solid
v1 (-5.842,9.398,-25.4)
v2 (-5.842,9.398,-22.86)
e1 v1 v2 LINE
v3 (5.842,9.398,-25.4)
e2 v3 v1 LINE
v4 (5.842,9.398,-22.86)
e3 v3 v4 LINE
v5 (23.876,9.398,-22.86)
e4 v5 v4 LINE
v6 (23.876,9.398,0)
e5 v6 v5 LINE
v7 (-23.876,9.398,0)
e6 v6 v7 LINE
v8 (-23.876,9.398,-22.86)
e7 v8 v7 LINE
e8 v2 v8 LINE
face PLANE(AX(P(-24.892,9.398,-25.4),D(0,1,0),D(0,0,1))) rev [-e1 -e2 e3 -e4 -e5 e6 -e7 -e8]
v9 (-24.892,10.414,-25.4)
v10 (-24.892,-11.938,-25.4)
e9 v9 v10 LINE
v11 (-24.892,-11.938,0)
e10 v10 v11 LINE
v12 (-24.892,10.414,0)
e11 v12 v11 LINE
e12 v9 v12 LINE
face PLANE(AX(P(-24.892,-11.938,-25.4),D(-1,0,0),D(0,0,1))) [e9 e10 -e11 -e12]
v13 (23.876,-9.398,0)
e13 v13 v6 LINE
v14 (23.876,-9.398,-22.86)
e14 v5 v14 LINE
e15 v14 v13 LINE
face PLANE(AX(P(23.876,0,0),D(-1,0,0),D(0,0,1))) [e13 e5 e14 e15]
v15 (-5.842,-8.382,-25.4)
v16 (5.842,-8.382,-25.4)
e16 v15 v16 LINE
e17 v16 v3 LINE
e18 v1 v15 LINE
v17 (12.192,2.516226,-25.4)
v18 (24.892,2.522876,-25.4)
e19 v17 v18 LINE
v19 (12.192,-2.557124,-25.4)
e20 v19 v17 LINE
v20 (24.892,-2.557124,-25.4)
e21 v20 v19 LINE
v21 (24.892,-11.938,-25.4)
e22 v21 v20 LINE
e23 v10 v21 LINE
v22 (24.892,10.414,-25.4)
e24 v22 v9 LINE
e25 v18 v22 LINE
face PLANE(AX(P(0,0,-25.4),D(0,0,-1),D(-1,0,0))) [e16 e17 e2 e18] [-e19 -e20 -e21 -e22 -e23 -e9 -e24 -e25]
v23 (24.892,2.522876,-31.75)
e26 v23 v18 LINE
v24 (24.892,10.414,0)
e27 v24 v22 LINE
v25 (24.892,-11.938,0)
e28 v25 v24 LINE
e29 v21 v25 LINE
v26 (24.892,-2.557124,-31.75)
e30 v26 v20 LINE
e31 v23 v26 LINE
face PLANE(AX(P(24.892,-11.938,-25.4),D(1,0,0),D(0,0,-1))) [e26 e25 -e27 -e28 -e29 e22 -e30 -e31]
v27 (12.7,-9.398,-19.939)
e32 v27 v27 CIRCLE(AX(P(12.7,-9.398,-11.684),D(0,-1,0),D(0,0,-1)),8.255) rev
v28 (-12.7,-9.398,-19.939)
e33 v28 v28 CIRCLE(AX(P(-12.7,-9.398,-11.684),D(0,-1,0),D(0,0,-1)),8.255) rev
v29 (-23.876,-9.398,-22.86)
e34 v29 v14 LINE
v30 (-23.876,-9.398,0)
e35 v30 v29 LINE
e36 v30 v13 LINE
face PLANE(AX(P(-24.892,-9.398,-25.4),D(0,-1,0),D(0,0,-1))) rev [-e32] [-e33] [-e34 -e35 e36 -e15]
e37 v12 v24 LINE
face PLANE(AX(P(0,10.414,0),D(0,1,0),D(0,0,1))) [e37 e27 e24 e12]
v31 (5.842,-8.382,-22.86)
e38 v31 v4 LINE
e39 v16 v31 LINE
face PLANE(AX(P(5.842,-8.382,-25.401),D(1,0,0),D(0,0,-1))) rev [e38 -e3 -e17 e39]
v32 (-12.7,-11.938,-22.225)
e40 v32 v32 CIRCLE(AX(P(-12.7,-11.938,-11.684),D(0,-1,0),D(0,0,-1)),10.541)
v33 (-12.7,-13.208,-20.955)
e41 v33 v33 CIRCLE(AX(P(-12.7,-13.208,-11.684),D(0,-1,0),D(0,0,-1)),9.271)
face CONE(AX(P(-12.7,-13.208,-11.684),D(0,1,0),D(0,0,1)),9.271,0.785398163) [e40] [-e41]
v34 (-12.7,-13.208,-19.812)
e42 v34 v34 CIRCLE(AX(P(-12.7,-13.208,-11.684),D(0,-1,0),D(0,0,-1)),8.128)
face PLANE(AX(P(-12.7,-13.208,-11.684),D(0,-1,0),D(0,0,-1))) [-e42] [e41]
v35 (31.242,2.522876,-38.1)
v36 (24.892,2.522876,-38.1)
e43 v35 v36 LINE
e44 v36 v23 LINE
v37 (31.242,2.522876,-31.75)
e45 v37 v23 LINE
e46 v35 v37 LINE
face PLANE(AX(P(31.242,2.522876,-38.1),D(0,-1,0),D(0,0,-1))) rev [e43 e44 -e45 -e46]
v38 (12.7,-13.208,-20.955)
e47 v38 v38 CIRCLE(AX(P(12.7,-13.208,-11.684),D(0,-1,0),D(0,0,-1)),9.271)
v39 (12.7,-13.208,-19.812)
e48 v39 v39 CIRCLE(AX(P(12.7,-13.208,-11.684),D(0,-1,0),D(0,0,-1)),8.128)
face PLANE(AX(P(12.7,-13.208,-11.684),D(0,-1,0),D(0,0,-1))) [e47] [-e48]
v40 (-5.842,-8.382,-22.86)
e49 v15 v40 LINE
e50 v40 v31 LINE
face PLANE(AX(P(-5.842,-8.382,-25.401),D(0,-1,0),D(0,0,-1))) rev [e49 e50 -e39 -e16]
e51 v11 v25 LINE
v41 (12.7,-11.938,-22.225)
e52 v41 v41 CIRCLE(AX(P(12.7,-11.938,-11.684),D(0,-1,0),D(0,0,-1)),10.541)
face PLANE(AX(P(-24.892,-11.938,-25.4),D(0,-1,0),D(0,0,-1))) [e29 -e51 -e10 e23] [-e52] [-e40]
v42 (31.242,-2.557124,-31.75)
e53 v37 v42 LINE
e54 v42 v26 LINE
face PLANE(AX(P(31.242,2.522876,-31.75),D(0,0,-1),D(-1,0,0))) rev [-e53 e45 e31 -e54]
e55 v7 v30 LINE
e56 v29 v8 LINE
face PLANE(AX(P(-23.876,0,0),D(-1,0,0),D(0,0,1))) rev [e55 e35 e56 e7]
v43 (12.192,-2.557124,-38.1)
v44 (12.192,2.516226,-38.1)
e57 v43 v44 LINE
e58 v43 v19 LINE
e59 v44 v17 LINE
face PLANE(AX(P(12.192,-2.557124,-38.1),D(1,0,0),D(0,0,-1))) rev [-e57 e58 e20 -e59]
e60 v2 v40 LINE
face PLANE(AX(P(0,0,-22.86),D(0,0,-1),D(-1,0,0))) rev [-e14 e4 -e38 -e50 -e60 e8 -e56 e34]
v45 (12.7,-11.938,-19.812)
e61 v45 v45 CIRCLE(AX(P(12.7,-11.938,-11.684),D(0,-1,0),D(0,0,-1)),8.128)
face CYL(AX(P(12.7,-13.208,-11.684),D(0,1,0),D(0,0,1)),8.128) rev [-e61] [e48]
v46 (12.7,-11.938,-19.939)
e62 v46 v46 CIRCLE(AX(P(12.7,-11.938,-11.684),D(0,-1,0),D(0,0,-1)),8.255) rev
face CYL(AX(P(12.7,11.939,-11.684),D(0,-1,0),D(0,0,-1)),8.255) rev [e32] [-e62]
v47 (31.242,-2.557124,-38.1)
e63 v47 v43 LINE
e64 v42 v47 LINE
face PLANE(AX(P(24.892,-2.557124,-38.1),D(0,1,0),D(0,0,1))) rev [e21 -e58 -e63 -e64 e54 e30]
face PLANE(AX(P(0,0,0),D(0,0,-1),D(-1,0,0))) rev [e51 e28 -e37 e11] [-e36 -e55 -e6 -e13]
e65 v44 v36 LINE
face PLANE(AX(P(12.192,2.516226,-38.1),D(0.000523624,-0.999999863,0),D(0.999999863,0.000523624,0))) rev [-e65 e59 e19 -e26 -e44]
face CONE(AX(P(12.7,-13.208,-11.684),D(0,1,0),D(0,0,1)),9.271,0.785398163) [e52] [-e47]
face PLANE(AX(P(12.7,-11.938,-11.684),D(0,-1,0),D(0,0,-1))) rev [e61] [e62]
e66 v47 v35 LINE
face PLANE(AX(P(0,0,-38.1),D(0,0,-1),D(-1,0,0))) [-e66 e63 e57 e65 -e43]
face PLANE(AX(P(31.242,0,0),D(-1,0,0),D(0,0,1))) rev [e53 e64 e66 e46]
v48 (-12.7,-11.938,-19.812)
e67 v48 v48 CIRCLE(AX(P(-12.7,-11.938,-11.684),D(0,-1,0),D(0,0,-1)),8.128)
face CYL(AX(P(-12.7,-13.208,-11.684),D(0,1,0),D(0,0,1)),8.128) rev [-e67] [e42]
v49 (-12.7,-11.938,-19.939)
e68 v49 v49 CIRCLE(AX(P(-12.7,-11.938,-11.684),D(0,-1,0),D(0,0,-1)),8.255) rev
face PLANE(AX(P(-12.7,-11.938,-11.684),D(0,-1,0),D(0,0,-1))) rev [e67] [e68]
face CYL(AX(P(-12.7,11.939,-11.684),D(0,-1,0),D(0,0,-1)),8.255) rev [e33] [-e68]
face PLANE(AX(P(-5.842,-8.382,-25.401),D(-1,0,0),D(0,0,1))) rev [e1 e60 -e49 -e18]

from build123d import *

# Parameters (mm, degrees)
SKETCH1_W           = 49.784
SKETCH1_H           = 23.876
BOSS_EXTRUDE1_DEPTH = 25.4
SHELL1_T            = -2.54
CUT_EXTRUDE1_REACH  = 44.835
SKETCH2_R           = 8.255
CUT_EXTRUDE2_REACH  = 37.843
SKETCH4_W           = 11.684
SKETCH4_H           = 17.78
SKETCH5_R           = 10.541
SKETCH5_R_2         = 8.128
BOSS_EXTRUDE3_DEPTH = 1.27
BOSS_EXTRUDE4_DEPTH = 12.7
SKETCH8_W           = 6.35
SKETCH8_H           = 5.08
BOSS_EXTRUDE5_DEPTH = 6.35
SKETCH9_W           = 22.86
SKETCH9_H           = 18.796
CUT_EXTRUDE3_DEPTH  = 1.524
SKETCH10_W          = 22.86
SKETCH10_H          = 18.796
CUT_EXTRUDE4_DEPTH  = 1.524
CHAMFER1_SIZE       = 1.27
SKETCH11_W          = 49.784
SKETCH11_H          = 25.4
CUT_EXTRUDE5_DEPTH  = 1.524


with BuildPart() as part:
    # Sketch1 → Boss-Extrude1 (new body)
    with BuildSketch(Plane.XY):
        Rectangle(SKETCH1_W, SKETCH1_H)
    extrude(amount=-BOSS_EXTRUDE1_DEPTH)

    # Shell1
    shell1_openings = [part.faces().sort_by_distance(p)[0] for p in [
        (0, 0, 0),
    ]]
    offset(amount=SHELL1_T, openings=shell1_openings, kind=Kind.INTERSECTION)

    # Sketch2 → Cut-Extrude1 (cut, up to next)
    with BuildSketch(Plane.XZ.offset(11.938), mode=Mode.PRIVATE) as cut_extrude1_sk1:
        with Locations(Location((-12.7, -11.684, 0), (0, 0, 270))):
            Circle(SKETCH2_R)
    cut_extrude1_tool1 = extrude(cut_extrude1_sk1.sketch, amount=-CUT_EXTRUDE1_REACH, mode=Mode.PRIVATE) & part.part
    # Sketch2 → Cut-Extrude1 (cut, up to next)
    with BuildSketch(Plane.XZ.offset(11.938), mode=Mode.PRIVATE) as cut_extrude1_sk2:
        with Locations(Location((12.7, -11.684, 0), (0, 0, 270))):
            Circle(SKETCH2_R)
    cut_extrude1_tool2 = extrude(cut_extrude1_sk2.sketch, amount=-CUT_EXTRUDE1_REACH, mode=Mode.PRIVATE) & part.part
    add(cut_extrude1_tool1.solids().sort_by_distance((-12.7, -11.938, -11.684))[0], mode=Mode.SUBTRACT)
    add(cut_extrude1_tool2.solids().sort_by_distance((12.7, -11.938, -11.684))[0], mode=Mode.SUBTRACT)

    # Sketch4 → Cut-Extrude2 (cut, up to next)
    with BuildSketch(Plane.XY.offset(-22.86), mode=Mode.PRIVATE) as cut_extrude2_sk1:
        with Locations((0, 0.508)):
            Rectangle(SKETCH4_W, SKETCH4_H)
    cut_extrude2_tool1 = extrude(cut_extrude2_sk1.sketch, amount=-CUT_EXTRUDE2_REACH, mode=Mode.PRIVATE) & part.part
    add(cut_extrude2_tool1.solids().sort_by_distance((0, 0.508, -22.86))[0], mode=Mode.SUBTRACT)

    # Sketch5 → Boss-Extrude3 (add)
    # profile 1 of 2: a face of its own
    with BuildSketch(Plane.XZ.offset(11.938)):
        with Locations(Location((-12.7, -11.684, 0), (0, 0, 270))):
            Circle(SKETCH5_R)
        with Locations(Location((-12.7, -11.684, 0), (0, 0, 270))):
            Circle(SKETCH5_R_2, mode=Mode.SUBTRACT)
    # profile 2 of 2: a face of its own
    with BuildSketch(Plane.XZ.offset(11.938)):
        with Locations(Location((12.7, -11.684, 0), (0, 0, 270))):
            Circle(SKETCH5_R)
        with Locations(Location((12.7, -11.684, 0), (0, 0, 270))):
            Circle(SKETCH5_R_2, mode=Mode.SUBTRACT)
    extrude(amount=BOSS_EXTRUDE3_DEPTH)

    # Sketch7 → Boss-Extrude4 (add)
    with BuildSketch(Plane(origin=(0, 0, -25.4), x_dir=(-1, 0, 0), z_dir=(0, 0, -1))):
        Polygon((-24.892, 2.522876328), (-24.892, -2.557123672), (-12.192, -2.557123672), (-12.192, 2.516226298), align=None)
    extrude(amount=BOSS_EXTRUDE4_DEPTH)

    # Sketch8 → Boss-Extrude5 (add)
    with BuildSketch(Plane(origin=(24.892, 0, 0), x_dir=(0, 0, -1), z_dir=(1, 0, 0))):
        with Locations((34.925, -0.017123672)):
            Rectangle(SKETCH8_W, SKETCH8_H)
    extrude(amount=BOSS_EXTRUDE5_DEPTH)

    # Sketch9 → Cut-Extrude3 (cut)
    with BuildSketch(Plane(origin=(-22.352, 0, 0), x_dir=(0, 0, -1), z_dir=(1, 0, 0))):
        with Locations((11.43, 0)):
            Rectangle(SKETCH9_W, SKETCH9_H)
    extrude(amount=-CUT_EXTRUDE3_DEPTH, mode=Mode.SUBTRACT)

    # Sketch10 → Cut-Extrude4 (cut)
    with BuildSketch(Plane.ZY.offset(-22.352)):
        with Locations((-11.43, 0)):
            Rectangle(SKETCH10_W, SKETCH10_H)
    extrude(amount=-CUT_EXTRUDE4_DEPTH, mode=Mode.SUBTRACT)

    # Chamfer1
    chamfer1_edges = [part.edges().sort_by_distance(p)[0] for p in [
        (-12.7, -13.208, -1.143),
        (12.7, -13.208, -1.143),
    ]]
    chamfer(chamfer1_edges, length=CHAMFER1_SIZE - 0.0001)  # a hair under: the kernel refuses the full size

    # Sketch11 → Cut-Extrude5 (cut)
    with BuildSketch(Plane(origin=(0, 11.938, 0), x_dir=(1, 0, 0), z_dir=(0, 1, 0))):
        with Locations((0, 12.7)):
            Rectangle(SKETCH11_W, SKETCH11_H)
    extrude(amount=-CUT_EXTRUDE5_DEPTH, mode=Mode.SUBTRACT)


solid = part.part
